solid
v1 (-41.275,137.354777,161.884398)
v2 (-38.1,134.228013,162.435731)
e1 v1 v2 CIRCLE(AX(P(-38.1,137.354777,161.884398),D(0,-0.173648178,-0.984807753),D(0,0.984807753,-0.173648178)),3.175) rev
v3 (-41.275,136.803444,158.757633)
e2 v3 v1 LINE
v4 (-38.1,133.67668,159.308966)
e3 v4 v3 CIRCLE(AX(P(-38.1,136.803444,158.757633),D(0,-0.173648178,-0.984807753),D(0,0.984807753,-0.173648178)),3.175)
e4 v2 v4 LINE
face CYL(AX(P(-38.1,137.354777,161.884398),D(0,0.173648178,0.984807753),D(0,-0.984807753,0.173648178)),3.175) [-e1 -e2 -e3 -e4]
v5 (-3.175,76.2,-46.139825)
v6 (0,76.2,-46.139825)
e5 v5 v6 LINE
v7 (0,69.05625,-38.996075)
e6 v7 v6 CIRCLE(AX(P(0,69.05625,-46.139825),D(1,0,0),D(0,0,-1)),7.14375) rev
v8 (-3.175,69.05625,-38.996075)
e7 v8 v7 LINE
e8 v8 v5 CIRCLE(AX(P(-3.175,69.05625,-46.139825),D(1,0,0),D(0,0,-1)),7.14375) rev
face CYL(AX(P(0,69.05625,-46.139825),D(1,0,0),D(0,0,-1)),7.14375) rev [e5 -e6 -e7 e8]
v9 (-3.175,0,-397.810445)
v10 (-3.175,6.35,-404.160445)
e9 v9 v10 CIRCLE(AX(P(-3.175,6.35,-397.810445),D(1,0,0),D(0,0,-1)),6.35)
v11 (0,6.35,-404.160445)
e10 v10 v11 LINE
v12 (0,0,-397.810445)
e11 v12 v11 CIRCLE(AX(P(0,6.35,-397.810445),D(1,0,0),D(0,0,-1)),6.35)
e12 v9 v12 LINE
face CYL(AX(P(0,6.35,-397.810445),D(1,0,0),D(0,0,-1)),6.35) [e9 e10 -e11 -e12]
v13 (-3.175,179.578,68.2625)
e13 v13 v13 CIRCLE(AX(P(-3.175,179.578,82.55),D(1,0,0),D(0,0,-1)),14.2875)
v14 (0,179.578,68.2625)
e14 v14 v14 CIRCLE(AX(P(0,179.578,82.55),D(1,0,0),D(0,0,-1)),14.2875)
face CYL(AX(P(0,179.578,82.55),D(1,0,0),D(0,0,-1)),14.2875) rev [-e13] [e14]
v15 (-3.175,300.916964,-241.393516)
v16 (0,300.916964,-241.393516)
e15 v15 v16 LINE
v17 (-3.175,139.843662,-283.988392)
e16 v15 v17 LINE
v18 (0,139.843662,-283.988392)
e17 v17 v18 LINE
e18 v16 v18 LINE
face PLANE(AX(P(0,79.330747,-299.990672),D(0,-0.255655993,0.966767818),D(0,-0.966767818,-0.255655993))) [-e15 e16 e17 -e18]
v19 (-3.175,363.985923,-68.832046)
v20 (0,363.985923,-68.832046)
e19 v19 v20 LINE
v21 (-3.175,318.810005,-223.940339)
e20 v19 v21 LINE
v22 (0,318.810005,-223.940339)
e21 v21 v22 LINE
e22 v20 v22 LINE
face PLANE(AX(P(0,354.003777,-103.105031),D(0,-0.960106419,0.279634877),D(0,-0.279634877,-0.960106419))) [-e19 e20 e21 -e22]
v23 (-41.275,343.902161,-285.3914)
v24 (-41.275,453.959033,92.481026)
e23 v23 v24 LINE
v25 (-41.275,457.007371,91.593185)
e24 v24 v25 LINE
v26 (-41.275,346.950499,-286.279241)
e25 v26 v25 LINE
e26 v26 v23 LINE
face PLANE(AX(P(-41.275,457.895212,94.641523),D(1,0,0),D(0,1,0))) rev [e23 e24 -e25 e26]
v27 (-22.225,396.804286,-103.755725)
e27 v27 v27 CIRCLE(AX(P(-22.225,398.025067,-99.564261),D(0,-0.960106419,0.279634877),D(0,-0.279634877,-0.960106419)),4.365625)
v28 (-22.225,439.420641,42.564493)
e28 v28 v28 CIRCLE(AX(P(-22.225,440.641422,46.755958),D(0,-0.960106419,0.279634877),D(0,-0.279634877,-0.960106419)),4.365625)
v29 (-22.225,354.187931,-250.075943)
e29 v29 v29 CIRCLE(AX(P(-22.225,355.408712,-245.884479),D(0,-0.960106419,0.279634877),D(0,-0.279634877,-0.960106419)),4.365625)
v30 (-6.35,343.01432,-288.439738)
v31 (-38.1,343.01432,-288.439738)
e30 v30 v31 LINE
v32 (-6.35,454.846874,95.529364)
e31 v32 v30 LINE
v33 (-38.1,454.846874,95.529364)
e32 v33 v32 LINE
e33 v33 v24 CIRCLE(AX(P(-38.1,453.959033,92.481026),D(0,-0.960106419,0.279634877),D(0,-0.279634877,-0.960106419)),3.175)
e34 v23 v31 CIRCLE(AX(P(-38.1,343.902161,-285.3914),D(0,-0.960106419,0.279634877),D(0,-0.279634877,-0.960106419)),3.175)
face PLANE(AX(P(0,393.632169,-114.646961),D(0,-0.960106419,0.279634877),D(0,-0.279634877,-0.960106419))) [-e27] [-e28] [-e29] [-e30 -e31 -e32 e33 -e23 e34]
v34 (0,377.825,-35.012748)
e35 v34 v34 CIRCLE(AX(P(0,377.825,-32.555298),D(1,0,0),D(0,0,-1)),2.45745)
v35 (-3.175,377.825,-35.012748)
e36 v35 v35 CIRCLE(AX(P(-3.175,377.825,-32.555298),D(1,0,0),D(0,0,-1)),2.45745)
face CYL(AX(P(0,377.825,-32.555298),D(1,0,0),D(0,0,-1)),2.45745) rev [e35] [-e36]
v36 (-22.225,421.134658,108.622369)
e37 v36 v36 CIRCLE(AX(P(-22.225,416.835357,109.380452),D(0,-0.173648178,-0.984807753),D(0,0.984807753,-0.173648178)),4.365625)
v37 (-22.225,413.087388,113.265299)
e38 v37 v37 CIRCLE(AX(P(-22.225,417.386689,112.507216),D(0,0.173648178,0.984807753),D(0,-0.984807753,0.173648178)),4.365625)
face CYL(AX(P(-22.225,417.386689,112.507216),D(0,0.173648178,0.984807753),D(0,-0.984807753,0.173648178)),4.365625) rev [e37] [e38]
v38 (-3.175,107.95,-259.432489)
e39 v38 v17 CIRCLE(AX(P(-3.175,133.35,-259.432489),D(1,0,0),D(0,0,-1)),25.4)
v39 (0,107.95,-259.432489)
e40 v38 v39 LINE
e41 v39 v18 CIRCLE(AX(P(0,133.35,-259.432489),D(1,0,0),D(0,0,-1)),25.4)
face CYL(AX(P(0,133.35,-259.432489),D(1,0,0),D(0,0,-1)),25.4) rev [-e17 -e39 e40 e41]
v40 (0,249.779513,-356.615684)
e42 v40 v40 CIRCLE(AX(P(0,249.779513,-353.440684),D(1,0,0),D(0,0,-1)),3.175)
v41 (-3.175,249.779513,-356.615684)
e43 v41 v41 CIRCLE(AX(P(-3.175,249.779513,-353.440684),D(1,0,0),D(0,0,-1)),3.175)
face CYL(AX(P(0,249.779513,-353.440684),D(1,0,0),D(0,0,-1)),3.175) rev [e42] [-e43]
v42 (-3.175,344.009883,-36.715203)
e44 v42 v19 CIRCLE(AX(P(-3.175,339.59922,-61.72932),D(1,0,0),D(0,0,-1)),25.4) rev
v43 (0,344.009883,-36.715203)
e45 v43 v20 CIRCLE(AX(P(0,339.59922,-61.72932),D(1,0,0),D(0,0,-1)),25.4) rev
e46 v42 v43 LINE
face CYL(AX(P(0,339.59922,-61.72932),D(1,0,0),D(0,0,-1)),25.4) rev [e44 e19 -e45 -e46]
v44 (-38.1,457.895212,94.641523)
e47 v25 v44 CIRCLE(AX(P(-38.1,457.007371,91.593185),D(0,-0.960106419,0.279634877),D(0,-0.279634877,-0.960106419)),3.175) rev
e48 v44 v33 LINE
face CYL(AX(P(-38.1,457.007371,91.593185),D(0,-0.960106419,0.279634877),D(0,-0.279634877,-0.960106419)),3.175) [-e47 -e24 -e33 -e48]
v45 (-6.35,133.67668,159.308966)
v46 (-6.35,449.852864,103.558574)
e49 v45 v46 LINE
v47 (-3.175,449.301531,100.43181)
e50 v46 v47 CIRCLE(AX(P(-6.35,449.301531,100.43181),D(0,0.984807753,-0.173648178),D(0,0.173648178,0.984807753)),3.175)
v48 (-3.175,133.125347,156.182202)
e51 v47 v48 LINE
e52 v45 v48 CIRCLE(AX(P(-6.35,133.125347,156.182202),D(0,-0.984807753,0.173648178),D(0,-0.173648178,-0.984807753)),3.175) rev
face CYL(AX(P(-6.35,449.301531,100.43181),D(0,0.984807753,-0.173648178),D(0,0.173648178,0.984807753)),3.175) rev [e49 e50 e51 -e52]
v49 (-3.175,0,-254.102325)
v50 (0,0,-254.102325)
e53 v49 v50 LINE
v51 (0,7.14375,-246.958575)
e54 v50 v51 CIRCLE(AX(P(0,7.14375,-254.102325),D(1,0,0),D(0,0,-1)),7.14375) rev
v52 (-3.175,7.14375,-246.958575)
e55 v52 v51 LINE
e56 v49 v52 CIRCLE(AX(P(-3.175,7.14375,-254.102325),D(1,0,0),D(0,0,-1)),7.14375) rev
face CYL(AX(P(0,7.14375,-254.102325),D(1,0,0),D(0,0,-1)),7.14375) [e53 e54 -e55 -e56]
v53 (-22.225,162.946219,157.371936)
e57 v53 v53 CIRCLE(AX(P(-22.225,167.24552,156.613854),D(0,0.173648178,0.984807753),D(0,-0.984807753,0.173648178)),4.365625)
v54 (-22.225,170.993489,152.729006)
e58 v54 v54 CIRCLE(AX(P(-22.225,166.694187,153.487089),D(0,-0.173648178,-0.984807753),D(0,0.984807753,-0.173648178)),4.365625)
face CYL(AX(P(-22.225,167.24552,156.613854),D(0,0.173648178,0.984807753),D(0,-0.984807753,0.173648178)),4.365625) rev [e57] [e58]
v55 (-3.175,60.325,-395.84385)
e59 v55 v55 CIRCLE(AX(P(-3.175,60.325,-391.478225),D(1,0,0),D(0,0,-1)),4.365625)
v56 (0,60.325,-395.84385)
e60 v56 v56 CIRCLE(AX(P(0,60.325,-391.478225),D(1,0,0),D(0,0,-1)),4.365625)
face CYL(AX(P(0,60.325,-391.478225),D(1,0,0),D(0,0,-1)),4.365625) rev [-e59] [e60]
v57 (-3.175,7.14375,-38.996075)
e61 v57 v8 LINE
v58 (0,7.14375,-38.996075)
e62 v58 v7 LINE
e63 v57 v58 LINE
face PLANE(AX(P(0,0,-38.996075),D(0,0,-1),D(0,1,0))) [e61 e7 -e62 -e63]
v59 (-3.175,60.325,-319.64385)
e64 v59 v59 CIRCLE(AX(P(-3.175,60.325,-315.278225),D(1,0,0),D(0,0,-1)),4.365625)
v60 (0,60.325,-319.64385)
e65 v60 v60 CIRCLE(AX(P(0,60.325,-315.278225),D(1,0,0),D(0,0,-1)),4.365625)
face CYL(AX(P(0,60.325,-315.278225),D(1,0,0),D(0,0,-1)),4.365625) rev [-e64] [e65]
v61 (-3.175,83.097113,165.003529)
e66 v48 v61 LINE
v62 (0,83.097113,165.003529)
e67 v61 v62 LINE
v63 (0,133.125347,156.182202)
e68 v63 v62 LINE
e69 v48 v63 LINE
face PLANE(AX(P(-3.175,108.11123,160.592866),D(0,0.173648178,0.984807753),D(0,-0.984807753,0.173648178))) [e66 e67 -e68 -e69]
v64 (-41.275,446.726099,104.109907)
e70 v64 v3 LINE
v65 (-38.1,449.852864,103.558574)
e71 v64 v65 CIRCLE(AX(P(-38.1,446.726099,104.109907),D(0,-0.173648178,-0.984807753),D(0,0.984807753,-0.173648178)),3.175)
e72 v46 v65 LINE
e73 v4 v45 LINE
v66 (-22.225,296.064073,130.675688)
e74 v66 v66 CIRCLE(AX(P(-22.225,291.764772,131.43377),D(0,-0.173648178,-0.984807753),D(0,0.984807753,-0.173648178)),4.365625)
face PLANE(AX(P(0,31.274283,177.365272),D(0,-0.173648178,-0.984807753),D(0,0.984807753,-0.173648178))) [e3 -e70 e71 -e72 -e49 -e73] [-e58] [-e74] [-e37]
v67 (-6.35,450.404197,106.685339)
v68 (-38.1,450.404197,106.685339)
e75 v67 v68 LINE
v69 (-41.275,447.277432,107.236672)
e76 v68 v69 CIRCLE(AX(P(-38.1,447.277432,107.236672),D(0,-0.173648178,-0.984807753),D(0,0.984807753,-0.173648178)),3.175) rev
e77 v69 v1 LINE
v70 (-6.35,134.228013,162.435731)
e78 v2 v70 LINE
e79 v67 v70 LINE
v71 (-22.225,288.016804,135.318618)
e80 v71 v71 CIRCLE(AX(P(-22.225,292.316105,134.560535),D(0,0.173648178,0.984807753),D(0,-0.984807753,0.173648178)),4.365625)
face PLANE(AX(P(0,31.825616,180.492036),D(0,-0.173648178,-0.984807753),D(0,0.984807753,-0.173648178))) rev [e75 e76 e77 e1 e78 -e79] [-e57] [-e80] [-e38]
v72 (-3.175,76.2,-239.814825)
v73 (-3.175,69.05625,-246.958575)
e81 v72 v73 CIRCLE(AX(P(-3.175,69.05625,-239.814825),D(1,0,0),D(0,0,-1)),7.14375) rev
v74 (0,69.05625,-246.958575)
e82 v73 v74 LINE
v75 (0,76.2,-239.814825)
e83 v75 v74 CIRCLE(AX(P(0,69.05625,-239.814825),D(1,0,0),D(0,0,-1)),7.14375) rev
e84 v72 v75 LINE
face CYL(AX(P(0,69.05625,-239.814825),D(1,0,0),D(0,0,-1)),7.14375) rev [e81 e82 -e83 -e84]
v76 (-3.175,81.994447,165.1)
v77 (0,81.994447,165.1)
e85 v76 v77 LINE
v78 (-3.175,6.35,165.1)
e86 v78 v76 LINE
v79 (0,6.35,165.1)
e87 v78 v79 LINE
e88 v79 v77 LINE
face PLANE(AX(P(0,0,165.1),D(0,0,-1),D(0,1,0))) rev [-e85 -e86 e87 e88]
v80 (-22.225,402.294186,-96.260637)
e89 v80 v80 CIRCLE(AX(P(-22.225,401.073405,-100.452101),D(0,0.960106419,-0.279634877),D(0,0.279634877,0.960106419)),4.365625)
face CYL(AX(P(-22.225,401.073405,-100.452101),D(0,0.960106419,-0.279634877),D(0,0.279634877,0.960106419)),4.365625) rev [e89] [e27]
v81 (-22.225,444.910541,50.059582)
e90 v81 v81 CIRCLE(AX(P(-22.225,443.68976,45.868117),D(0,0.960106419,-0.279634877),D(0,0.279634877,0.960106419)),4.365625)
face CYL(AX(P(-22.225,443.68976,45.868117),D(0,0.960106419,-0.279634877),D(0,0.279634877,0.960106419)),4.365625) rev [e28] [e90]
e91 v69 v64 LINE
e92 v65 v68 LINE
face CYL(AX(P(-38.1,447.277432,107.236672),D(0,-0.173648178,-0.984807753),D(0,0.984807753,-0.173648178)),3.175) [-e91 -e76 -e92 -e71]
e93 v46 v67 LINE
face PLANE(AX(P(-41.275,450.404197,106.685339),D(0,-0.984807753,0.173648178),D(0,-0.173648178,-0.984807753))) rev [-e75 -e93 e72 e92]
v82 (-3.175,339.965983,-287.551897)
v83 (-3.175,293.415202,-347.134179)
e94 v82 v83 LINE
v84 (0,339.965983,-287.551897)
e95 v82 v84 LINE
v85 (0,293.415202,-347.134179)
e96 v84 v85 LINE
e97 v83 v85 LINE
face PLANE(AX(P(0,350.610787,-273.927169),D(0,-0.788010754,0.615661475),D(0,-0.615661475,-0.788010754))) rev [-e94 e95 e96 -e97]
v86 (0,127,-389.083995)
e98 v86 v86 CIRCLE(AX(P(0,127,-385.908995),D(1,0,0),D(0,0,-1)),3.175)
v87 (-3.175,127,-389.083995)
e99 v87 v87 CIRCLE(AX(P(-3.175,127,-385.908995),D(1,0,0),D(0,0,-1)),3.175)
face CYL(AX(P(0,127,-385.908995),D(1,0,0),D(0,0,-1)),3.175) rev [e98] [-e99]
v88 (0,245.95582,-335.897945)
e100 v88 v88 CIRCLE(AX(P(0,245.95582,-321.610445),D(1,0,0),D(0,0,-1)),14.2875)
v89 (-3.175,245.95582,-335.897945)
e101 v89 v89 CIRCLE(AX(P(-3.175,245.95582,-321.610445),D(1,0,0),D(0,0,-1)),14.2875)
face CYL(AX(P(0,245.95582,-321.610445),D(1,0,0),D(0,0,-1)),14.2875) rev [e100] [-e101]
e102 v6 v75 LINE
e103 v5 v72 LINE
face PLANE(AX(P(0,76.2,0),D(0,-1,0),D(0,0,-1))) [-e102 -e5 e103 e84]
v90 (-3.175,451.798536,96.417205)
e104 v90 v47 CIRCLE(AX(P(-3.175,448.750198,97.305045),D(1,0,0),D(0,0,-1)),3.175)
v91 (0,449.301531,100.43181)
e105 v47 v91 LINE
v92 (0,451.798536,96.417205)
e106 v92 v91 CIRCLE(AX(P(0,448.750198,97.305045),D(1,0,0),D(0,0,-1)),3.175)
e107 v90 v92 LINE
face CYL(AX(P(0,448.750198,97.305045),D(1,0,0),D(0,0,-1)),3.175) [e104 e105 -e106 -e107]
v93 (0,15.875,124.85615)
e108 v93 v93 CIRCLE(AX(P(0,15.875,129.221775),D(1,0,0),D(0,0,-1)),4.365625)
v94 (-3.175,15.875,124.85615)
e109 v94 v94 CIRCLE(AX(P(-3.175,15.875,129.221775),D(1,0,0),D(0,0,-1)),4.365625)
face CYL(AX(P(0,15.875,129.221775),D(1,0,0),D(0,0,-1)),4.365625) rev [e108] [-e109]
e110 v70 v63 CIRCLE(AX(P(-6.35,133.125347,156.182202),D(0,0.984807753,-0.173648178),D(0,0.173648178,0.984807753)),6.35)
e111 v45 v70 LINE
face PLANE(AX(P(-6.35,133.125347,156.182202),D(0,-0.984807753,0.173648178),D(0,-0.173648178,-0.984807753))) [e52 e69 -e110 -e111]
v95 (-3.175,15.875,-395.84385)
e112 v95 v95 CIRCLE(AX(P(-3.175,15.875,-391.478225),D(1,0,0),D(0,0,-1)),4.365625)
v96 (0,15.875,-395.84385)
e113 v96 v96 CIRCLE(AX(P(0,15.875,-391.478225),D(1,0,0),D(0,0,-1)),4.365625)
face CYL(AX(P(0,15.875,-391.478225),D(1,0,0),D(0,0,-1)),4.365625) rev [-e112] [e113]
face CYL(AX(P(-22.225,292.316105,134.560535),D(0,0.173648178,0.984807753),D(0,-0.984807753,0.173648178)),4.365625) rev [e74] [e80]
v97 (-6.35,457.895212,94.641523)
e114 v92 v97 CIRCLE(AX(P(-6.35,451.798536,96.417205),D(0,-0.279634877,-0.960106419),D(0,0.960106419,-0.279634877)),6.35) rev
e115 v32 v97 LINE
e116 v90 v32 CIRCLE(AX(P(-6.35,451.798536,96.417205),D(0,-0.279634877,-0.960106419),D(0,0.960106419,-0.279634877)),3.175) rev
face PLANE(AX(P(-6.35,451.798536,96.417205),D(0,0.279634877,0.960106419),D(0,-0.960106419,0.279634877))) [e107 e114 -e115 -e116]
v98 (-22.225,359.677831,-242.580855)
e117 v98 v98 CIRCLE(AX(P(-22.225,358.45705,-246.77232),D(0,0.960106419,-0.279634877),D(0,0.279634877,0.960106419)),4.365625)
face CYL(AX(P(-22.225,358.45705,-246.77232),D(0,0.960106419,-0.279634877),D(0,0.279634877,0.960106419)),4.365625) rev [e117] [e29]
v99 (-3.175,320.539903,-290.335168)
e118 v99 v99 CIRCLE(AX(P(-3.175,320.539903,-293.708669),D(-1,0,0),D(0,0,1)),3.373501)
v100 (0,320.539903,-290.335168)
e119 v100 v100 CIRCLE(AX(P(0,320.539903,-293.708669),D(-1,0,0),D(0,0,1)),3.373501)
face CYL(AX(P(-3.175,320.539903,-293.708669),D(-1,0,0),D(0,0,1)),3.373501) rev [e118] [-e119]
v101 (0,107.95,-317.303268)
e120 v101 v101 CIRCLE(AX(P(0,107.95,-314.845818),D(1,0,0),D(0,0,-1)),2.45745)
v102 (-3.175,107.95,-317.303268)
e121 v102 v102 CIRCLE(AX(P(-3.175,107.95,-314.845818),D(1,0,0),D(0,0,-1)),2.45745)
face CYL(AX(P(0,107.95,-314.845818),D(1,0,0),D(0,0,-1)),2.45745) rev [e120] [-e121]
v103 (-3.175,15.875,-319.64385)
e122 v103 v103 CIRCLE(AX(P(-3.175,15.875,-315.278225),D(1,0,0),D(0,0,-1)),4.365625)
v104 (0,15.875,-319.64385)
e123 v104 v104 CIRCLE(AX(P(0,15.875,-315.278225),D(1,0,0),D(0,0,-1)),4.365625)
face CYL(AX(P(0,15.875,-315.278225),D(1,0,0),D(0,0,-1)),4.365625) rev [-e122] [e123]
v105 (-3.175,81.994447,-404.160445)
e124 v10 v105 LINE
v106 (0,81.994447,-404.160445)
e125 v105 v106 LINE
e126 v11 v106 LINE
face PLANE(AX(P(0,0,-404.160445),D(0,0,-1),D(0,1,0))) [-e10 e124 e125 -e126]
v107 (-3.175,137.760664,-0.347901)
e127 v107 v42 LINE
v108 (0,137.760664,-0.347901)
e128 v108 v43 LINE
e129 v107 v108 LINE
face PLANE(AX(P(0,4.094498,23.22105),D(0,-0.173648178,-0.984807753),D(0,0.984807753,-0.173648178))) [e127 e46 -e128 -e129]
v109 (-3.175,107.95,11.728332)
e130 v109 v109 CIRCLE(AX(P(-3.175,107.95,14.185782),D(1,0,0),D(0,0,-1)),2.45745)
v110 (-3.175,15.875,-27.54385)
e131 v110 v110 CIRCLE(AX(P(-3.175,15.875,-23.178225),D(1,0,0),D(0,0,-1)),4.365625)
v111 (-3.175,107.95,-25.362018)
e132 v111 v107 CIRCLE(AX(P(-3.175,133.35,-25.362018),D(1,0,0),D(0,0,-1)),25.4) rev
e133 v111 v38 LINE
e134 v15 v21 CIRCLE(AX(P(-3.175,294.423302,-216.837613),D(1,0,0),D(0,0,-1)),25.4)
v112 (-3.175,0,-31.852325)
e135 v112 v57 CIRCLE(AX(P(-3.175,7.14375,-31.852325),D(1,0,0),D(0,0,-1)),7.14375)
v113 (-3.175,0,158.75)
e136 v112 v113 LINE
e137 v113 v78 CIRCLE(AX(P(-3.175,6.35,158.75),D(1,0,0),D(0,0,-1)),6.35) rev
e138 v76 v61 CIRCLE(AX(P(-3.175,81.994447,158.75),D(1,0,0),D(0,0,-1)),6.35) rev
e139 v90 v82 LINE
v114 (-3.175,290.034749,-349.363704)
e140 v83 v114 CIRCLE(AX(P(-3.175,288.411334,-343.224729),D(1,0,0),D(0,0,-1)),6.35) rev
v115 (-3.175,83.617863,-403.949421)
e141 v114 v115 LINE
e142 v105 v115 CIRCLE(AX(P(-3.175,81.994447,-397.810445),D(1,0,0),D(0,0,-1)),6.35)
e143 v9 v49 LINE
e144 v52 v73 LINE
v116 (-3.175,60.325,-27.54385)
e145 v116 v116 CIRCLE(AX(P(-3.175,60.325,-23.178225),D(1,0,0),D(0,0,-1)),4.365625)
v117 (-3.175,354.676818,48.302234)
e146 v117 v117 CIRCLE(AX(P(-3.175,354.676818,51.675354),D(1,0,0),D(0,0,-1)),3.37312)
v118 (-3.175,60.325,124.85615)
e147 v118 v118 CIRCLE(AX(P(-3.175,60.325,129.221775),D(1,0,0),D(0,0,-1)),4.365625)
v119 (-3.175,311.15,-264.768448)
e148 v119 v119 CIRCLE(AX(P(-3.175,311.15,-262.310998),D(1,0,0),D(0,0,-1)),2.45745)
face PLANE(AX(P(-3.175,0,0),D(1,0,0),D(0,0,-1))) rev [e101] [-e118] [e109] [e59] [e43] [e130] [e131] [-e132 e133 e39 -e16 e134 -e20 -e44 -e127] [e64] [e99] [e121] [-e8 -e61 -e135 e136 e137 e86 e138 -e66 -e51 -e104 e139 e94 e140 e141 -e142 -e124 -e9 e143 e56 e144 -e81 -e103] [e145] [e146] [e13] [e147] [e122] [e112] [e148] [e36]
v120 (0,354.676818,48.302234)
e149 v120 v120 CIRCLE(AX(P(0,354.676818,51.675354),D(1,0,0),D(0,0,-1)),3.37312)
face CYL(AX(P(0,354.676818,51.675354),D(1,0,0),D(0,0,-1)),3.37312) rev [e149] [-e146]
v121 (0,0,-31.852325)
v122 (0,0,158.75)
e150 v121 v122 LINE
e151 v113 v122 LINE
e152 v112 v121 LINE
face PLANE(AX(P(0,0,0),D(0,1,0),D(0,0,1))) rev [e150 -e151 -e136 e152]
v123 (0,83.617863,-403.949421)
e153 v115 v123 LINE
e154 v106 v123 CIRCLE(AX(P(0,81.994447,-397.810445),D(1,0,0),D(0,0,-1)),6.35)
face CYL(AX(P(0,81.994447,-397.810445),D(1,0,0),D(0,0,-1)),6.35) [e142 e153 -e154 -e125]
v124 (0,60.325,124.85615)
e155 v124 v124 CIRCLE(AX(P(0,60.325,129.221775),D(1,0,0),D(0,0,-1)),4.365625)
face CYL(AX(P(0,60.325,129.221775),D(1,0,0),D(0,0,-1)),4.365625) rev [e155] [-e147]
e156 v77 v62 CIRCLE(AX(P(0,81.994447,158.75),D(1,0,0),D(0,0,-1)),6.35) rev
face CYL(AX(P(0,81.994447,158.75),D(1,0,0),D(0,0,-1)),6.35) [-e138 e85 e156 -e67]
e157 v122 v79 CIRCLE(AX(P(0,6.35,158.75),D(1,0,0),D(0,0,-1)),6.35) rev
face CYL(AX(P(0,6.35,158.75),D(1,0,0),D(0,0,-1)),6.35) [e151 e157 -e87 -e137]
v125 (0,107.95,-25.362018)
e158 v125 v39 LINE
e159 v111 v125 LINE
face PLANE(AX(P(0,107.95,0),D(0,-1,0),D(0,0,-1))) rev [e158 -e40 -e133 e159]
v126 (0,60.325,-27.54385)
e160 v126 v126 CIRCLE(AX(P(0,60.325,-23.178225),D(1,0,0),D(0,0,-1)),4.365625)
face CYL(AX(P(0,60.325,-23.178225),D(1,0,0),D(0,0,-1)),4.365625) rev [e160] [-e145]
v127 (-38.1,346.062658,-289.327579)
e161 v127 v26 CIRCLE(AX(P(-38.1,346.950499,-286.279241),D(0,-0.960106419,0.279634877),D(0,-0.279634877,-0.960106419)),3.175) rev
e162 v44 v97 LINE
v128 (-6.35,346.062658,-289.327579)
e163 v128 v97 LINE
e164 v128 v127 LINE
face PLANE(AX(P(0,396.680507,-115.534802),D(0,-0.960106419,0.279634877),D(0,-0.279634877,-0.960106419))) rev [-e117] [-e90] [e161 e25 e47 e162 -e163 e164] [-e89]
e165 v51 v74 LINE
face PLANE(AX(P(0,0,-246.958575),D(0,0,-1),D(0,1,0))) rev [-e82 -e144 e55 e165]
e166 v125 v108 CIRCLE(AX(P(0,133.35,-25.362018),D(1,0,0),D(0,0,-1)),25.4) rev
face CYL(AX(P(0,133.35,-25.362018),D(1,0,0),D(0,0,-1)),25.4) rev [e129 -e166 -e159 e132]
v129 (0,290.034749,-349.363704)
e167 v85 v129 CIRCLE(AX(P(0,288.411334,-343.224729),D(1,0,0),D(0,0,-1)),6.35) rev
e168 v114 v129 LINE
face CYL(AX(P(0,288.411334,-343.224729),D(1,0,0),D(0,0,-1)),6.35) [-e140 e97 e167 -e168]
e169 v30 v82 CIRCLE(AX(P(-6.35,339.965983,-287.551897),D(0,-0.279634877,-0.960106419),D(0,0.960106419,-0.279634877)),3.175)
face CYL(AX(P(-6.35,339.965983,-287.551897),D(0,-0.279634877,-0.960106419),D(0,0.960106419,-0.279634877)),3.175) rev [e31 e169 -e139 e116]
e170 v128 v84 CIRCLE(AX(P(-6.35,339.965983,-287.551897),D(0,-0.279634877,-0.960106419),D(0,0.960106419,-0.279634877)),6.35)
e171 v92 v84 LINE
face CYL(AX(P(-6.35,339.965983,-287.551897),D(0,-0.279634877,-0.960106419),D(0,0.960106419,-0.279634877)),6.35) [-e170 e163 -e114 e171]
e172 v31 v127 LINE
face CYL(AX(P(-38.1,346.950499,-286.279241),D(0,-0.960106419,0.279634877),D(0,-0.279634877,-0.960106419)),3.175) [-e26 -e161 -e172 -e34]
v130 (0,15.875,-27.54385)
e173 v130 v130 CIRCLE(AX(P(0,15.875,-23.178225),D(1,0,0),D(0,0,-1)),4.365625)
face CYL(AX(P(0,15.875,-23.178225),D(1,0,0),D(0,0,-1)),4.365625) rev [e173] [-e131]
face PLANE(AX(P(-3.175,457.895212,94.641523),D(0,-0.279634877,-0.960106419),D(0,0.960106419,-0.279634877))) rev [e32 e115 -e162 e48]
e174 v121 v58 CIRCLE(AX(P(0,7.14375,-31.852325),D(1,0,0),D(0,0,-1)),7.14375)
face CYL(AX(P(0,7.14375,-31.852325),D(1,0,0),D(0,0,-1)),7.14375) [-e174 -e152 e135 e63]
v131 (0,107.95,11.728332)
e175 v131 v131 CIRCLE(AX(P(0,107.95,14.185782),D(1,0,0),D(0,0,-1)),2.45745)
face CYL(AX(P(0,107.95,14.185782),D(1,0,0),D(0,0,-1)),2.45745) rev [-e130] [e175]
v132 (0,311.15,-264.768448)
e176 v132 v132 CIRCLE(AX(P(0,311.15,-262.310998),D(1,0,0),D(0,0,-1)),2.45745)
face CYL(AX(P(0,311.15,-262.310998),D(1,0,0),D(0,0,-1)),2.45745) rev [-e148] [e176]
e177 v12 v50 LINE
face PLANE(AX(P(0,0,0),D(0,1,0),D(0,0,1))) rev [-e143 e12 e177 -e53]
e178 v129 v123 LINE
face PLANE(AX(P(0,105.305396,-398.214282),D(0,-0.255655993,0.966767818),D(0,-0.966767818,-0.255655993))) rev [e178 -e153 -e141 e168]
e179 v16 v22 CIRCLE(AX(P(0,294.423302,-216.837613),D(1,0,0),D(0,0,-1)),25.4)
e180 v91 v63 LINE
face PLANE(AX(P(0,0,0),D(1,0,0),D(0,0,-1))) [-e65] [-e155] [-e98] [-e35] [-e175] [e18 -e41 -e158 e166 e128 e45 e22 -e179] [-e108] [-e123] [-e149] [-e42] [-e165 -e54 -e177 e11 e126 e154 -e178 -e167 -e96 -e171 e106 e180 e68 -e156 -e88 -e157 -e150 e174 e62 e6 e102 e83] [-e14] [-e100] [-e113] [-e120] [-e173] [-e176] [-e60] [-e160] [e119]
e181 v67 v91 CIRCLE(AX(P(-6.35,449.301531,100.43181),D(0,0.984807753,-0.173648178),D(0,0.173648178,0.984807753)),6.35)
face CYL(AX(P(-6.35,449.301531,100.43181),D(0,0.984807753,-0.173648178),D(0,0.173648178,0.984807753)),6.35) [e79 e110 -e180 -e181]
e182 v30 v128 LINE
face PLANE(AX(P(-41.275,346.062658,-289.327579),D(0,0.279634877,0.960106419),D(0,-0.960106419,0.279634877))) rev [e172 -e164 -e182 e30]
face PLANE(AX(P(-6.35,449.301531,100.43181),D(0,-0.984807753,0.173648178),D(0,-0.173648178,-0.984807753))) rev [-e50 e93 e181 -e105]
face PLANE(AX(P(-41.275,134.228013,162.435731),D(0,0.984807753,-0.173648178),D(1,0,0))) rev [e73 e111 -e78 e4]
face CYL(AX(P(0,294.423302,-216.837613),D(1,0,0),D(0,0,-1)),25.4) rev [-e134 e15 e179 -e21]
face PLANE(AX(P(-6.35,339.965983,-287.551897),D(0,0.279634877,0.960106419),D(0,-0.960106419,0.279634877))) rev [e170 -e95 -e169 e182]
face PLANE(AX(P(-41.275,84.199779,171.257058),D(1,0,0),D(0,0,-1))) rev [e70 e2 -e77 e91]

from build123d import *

# Parameters (mm, degrees)
SKETCH1_R                            = 14.2875
SKETCH1_R_2                          = 3.37312
BOSS_EXTRUDE1_DEPTH                  = 3.175
EDGE_FLANGE1_DEPTH                   = 399.923481586
EDGE_FLANGE2_DEPTH                   = 371.853711622
F_11_32_0_34375_DIAMETER_HOLE4_D     = 8.73125
F_1_4_0_25_DIAMETER_HOLE1_D          = 6.35
F_17_64_0_26563_DIAMETER_HOLE2_D     = 6.747002
F_11_32_0_34375_DIAMETER_HOLE2_D     = 8.73125
F_11_32_0_34375_DIAMETER_HOLE3_D     = 8.73125
F_11_32_0_34375_DIAMETER_HOLE3_DEPTH = 3.175
F_10_0_1935_DIAMETER_HOLE1_D         = 4.9149
CUT_EXTRUDE1_DEPTH                   = 50.8
FILLET1_R                            = 3.175


# Sheet-metal steps are written as plain solids
with BuildPart() as part:
    # Sketch1 → Boss-Extrude1 (new body)
    with BuildSketch(Plane(origin=(0, 0, 0), x_dir=(0, 0, -1), z_dir=(1, 0, 0))):
        with BuildLine():
            Line((397.810445414, 0), (254.102325414, 0))
            ThreePointArc((254.102325414, 0), (249.050931346, 2.092355932), (246.958575414, 7.14375))
            Line((246.958575414, 7.14375), (246.958575414, 69.05625))
            ThreePointArc((246.958575414, 69.05625), (244.866219482, 74.107644068), (239.814825414, 76.2))
            Line((239.814825414, 76.2), (46.139825414, 76.2))
            ThreePointArc((46.139825414, 76.2), (41.088431346, 74.107644068), (38.996075414, 69.05625))
            Line((38.996075414, 69.05625), (38.996075414, 7.14375))
            ThreePointArc((38.996075414, 7.14375), (36.903719482, 2.092355932), (31.852325414, 0))
            Line((31.852325414, 0), (-158.75, 0))
            ThreePointArc((-158.75, 0), (-163.240128061, 1.859871939), (-165.1, 6.35))
            Line((-165.1, 6.35), (-165.1, 81.994446987))
            ThreePointArc((-165.1, 81.994446987), (-165.075836333, 82.547885953), (-165.003529232, 83.097112915))
            Line((-165.003529232, 83.097112915), (-100.43180985, 449.301531106))
            ThreePointArc((-100.43180985, 449.301531106), (-98.981933252, 451.446245541), (-96.4172045, 451.798536022))
            Line((-96.4172045, 451.798536022), (287.551897257, 339.965982534))
            Line((287.551897257, 339.965982534), (347.134178996, 293.415202216))
            ThreePointArc((347.134178996, 293.415202216), (348.525632464, 291.907463008), (349.363704269, 290.034749489))
            Line((349.363704269, 290.034749489), (403.949421055, 83.617862545))
            ThreePointArc((403.949421055, 83.617862545), (404.107468334, 82.812983692), (404.160445414, 81.994446987))
            Line((404.160445414, 81.994446987), (404.160445414, 6.35))
            ThreePointArc((404.160445414, 6.35), (402.300573474, 1.859871939), (397.810445414, 0))
        make_face()
        with Locations((-82.55, 179.578)):
            Circle(SKETCH1_R, mode=Mode.SUBTRACT)
        with Locations((-51.675354011, 354.676818486)):
            Circle(SKETCH1_R_2, mode=Mode.SUBTRACT)
        with Locations((321.610445414, 245.95582)):
            Circle(SKETCH1_R, mode=Mode.SUBTRACT)
        with BuildLine():
            Line((25.362018074, 107.95), (259.432488996, 107.95))
            ThreePointArc((259.432488996, 107.95), (279.55833085, 117.854500987), (283.988391562, 139.843662232))
            Line((283.988391562, 139.843662232), (241.393515847, 300.916964234))
            ThreePointArc((241.393515847, 300.916964234), (235.020226293, 312.158932355), (223.940339151, 318.810005043))
            Line((223.940339151, 318.810005043), (68.8320461, 363.985922583))
            ThreePointArc((68.8320461, 363.985922583), (48.314216085, 361.16759873), (36.715203303, 344.009883255))
            Line((36.715203303, 344.009883255), (0.347901148, 137.760663713))
            ThreePointArc((0.347901148, 137.760663713), (5.904489219, 117.023194714), (25.362018074, 107.95))
        make_face(mode=Mode.SUBTRACT)
    extrude(amount=-BOSS_EXTRUDE1_DEPTH)

    # Edge-Flange1 section (across the edge) → Edge-Flange1 (add)
    with BuildSketch(Plane(origin=(-3.175, 454.846873902, 95.529363767), x_dir=(-3.4914813388431334e-15, -0.9601064189437506, 0.2796348767643397), z_dir=(0, -0.2796348767643397, -0.9601064189437506))):
        with BuildLine():
            Line((-3.175, 3.175), (-3.175, 38.1))
            Line((-3.175, 38.1), (0, 38.1))
            Line((0, 38.1), (0, 3.175))
            ThreePointArc((0, 3.175), (0.92993597, 0.92993597), (3.175, 0))
            Line((3.175, 0), (3.175, -3.175))
            ThreePointArc((3.175, -3.175), (-1.315128061, -1.315128061), (-3.175, 3.175))
        make_face()
    extrude(amount=EDGE_FLANGE1_DEPTH)

    # Edge-Flange2 section (across the edge) → Edge-Flange2 (add)
    with BuildSketch(Plane(origin=(-3.175, 83.648445879, 168.130293847), x_dir=(-3.4914813388431334e-15, -0.17364817766692356, -0.9848077530122092), z_dir=(0, 0.9848077530122092, -0.17364817766692356))):
        with BuildLine():
            Line((-3.175, 3.175), (-3.175, 38.1))
            Line((-3.175, 38.1), (0, 38.1))
            Line((0, 38.1), (0, 3.175))
            ThreePointArc((0, 3.175), (0.92993597, 0.92993597), (3.175, 0))
            Line((3.175, 0), (3.175, -3.175))
            ThreePointArc((3.175, -3.175), (-1.315128061, -1.315128061), (-3.175, 3.175))
        make_face()
    extrude(amount=EDGE_FLANGE2_DEPTH)

    # 11/32 (0.34375) Diameter Hole4 (through all)
    with Locations(Plane(origin=(0, 0, 0), x_dir=(0, 0, -1), z_dir=(1, 0, 0))):
        with Locations((391.478225414, 60.325), (315.278225414, 60.325), (315.278225414, 15.875), (391.478225414, 15.875), (23.178225414, 60.325), (23.178225414, 15.875), (-129.221774586, 15.875), (-129.221774586, 60.325)):
            Hole(F_11_32_0_34375_DIAMETER_HOLE4_D / 2)

    # 1/4 (0.25) Diameter Hole1 (through all)
    with Locations(Plane(origin=(0, 0, 0), x_dir=(0, 0, -1), z_dir=(1, 0, 0))):
        with Locations((353.440683712, 249.779512828), (385.908994874, 127)):
            Hole(F_1_4_0_25_DIAMETER_HOLE1_D / 2)

    # 17/64 (0.26563) Diameter Hole2 (through all)
    with Locations(Plane.ZY.offset(3.175)):
        with Locations((-293.708669101, 320.53990281)):
            Hole(F_17_64_0_26563_DIAMETER_HOLE2_D / 2)

    # 11/32 (0.34375) Diameter Hole2 (through all)
    with Locations(Plane(origin=(0, 396.680507326, -115.53480176), x_dir=(1, 0, 0), z_dir=(3.001434441127967e-15, 0.9601064189437506, -0.27963487676433957))):
        with Locations((-22.225, 136.69059512), (-22.225, -15.70940488), (-22.225, -168.10940488)):
            Hole(F_11_32_0_34375_DIAMETER_HOLE2_D / 2)

    # 11/32 (0.34375) Diameter Hole3
    with Locations(Plane(origin=(0, 31.825615837, 180.492036493), x_dir=(1, 0, 0), z_dir=(3.6503775023836e-15, 0.17364817766692356, 0.9848077530122092))):
        with Locations((-22.225, 391.508974703), (-22.225, 264.508974703), (-22.225, 137.508974703)):
            Hole(F_11_32_0_34375_DIAMETER_HOLE3_D / 2, depth=F_11_32_0_34375_DIAMETER_HOLE3_DEPTH)

    # #10 (0.1935) Diameter Hole1 (through all)
    with Locations(Plane(origin=(0, 0, 0), x_dir=(0, 0, -1), z_dir=(1, 0, 0))):
        with Locations((32.555298074, 377.825), (-14.185781926, 107.95), (314.845818074, 107.95), (262.310998074, 311.15)):
            Hole(F_10_0_1935_DIAMETER_HOLE1_D / 2)

    # Sketch31 → Cut-Extrude1 (cut)
    with BuildSketch(Plane(origin=(0, 52.374163006, -9.23497803), x_dir=(1, 0, 0), z_dir=(0, -0.9848077530122092, 0.17364817766692356))):
        with BuildLine():
            Line((-3.175, 176.926417089), (0, 176.926417089))
            ThreePointArc((0, 176.926417089), (-1.859871939, 181.416545149), (-6.35, 183.276417089))
            Line((-6.35, 183.276417089), (-41.275, 183.276417089))
            Line((-41.275, 183.276417089), (-41.275, 180.101417089))
            Line((-41.275, 180.101417089), (-6.35, 180.101417089))
            ThreePointArc((-6.35, 180.101417089), (-4.10493597, 179.171481119), (-3.175, 176.926417089))
        make_face()
    extrude(amount=-CUT_EXTRUDE1_DEPTH, mode=Mode.SUBTRACT)

    # Fillet1
    fillet1_edges = [part.edges().sort_by_distance(p)[0] for p in [
        (-41.275, 450.128530552, 105.121956774),
        (-41.275, 133.952346214, 160.87234873),
        (-41.275, 456.371042842, 95.0854434),
        (-41.275, 344.538489354, -288.883658358),
    ]]
    fillet(fillet1_edges, radius=FILLET1_R)


solid = part.part
